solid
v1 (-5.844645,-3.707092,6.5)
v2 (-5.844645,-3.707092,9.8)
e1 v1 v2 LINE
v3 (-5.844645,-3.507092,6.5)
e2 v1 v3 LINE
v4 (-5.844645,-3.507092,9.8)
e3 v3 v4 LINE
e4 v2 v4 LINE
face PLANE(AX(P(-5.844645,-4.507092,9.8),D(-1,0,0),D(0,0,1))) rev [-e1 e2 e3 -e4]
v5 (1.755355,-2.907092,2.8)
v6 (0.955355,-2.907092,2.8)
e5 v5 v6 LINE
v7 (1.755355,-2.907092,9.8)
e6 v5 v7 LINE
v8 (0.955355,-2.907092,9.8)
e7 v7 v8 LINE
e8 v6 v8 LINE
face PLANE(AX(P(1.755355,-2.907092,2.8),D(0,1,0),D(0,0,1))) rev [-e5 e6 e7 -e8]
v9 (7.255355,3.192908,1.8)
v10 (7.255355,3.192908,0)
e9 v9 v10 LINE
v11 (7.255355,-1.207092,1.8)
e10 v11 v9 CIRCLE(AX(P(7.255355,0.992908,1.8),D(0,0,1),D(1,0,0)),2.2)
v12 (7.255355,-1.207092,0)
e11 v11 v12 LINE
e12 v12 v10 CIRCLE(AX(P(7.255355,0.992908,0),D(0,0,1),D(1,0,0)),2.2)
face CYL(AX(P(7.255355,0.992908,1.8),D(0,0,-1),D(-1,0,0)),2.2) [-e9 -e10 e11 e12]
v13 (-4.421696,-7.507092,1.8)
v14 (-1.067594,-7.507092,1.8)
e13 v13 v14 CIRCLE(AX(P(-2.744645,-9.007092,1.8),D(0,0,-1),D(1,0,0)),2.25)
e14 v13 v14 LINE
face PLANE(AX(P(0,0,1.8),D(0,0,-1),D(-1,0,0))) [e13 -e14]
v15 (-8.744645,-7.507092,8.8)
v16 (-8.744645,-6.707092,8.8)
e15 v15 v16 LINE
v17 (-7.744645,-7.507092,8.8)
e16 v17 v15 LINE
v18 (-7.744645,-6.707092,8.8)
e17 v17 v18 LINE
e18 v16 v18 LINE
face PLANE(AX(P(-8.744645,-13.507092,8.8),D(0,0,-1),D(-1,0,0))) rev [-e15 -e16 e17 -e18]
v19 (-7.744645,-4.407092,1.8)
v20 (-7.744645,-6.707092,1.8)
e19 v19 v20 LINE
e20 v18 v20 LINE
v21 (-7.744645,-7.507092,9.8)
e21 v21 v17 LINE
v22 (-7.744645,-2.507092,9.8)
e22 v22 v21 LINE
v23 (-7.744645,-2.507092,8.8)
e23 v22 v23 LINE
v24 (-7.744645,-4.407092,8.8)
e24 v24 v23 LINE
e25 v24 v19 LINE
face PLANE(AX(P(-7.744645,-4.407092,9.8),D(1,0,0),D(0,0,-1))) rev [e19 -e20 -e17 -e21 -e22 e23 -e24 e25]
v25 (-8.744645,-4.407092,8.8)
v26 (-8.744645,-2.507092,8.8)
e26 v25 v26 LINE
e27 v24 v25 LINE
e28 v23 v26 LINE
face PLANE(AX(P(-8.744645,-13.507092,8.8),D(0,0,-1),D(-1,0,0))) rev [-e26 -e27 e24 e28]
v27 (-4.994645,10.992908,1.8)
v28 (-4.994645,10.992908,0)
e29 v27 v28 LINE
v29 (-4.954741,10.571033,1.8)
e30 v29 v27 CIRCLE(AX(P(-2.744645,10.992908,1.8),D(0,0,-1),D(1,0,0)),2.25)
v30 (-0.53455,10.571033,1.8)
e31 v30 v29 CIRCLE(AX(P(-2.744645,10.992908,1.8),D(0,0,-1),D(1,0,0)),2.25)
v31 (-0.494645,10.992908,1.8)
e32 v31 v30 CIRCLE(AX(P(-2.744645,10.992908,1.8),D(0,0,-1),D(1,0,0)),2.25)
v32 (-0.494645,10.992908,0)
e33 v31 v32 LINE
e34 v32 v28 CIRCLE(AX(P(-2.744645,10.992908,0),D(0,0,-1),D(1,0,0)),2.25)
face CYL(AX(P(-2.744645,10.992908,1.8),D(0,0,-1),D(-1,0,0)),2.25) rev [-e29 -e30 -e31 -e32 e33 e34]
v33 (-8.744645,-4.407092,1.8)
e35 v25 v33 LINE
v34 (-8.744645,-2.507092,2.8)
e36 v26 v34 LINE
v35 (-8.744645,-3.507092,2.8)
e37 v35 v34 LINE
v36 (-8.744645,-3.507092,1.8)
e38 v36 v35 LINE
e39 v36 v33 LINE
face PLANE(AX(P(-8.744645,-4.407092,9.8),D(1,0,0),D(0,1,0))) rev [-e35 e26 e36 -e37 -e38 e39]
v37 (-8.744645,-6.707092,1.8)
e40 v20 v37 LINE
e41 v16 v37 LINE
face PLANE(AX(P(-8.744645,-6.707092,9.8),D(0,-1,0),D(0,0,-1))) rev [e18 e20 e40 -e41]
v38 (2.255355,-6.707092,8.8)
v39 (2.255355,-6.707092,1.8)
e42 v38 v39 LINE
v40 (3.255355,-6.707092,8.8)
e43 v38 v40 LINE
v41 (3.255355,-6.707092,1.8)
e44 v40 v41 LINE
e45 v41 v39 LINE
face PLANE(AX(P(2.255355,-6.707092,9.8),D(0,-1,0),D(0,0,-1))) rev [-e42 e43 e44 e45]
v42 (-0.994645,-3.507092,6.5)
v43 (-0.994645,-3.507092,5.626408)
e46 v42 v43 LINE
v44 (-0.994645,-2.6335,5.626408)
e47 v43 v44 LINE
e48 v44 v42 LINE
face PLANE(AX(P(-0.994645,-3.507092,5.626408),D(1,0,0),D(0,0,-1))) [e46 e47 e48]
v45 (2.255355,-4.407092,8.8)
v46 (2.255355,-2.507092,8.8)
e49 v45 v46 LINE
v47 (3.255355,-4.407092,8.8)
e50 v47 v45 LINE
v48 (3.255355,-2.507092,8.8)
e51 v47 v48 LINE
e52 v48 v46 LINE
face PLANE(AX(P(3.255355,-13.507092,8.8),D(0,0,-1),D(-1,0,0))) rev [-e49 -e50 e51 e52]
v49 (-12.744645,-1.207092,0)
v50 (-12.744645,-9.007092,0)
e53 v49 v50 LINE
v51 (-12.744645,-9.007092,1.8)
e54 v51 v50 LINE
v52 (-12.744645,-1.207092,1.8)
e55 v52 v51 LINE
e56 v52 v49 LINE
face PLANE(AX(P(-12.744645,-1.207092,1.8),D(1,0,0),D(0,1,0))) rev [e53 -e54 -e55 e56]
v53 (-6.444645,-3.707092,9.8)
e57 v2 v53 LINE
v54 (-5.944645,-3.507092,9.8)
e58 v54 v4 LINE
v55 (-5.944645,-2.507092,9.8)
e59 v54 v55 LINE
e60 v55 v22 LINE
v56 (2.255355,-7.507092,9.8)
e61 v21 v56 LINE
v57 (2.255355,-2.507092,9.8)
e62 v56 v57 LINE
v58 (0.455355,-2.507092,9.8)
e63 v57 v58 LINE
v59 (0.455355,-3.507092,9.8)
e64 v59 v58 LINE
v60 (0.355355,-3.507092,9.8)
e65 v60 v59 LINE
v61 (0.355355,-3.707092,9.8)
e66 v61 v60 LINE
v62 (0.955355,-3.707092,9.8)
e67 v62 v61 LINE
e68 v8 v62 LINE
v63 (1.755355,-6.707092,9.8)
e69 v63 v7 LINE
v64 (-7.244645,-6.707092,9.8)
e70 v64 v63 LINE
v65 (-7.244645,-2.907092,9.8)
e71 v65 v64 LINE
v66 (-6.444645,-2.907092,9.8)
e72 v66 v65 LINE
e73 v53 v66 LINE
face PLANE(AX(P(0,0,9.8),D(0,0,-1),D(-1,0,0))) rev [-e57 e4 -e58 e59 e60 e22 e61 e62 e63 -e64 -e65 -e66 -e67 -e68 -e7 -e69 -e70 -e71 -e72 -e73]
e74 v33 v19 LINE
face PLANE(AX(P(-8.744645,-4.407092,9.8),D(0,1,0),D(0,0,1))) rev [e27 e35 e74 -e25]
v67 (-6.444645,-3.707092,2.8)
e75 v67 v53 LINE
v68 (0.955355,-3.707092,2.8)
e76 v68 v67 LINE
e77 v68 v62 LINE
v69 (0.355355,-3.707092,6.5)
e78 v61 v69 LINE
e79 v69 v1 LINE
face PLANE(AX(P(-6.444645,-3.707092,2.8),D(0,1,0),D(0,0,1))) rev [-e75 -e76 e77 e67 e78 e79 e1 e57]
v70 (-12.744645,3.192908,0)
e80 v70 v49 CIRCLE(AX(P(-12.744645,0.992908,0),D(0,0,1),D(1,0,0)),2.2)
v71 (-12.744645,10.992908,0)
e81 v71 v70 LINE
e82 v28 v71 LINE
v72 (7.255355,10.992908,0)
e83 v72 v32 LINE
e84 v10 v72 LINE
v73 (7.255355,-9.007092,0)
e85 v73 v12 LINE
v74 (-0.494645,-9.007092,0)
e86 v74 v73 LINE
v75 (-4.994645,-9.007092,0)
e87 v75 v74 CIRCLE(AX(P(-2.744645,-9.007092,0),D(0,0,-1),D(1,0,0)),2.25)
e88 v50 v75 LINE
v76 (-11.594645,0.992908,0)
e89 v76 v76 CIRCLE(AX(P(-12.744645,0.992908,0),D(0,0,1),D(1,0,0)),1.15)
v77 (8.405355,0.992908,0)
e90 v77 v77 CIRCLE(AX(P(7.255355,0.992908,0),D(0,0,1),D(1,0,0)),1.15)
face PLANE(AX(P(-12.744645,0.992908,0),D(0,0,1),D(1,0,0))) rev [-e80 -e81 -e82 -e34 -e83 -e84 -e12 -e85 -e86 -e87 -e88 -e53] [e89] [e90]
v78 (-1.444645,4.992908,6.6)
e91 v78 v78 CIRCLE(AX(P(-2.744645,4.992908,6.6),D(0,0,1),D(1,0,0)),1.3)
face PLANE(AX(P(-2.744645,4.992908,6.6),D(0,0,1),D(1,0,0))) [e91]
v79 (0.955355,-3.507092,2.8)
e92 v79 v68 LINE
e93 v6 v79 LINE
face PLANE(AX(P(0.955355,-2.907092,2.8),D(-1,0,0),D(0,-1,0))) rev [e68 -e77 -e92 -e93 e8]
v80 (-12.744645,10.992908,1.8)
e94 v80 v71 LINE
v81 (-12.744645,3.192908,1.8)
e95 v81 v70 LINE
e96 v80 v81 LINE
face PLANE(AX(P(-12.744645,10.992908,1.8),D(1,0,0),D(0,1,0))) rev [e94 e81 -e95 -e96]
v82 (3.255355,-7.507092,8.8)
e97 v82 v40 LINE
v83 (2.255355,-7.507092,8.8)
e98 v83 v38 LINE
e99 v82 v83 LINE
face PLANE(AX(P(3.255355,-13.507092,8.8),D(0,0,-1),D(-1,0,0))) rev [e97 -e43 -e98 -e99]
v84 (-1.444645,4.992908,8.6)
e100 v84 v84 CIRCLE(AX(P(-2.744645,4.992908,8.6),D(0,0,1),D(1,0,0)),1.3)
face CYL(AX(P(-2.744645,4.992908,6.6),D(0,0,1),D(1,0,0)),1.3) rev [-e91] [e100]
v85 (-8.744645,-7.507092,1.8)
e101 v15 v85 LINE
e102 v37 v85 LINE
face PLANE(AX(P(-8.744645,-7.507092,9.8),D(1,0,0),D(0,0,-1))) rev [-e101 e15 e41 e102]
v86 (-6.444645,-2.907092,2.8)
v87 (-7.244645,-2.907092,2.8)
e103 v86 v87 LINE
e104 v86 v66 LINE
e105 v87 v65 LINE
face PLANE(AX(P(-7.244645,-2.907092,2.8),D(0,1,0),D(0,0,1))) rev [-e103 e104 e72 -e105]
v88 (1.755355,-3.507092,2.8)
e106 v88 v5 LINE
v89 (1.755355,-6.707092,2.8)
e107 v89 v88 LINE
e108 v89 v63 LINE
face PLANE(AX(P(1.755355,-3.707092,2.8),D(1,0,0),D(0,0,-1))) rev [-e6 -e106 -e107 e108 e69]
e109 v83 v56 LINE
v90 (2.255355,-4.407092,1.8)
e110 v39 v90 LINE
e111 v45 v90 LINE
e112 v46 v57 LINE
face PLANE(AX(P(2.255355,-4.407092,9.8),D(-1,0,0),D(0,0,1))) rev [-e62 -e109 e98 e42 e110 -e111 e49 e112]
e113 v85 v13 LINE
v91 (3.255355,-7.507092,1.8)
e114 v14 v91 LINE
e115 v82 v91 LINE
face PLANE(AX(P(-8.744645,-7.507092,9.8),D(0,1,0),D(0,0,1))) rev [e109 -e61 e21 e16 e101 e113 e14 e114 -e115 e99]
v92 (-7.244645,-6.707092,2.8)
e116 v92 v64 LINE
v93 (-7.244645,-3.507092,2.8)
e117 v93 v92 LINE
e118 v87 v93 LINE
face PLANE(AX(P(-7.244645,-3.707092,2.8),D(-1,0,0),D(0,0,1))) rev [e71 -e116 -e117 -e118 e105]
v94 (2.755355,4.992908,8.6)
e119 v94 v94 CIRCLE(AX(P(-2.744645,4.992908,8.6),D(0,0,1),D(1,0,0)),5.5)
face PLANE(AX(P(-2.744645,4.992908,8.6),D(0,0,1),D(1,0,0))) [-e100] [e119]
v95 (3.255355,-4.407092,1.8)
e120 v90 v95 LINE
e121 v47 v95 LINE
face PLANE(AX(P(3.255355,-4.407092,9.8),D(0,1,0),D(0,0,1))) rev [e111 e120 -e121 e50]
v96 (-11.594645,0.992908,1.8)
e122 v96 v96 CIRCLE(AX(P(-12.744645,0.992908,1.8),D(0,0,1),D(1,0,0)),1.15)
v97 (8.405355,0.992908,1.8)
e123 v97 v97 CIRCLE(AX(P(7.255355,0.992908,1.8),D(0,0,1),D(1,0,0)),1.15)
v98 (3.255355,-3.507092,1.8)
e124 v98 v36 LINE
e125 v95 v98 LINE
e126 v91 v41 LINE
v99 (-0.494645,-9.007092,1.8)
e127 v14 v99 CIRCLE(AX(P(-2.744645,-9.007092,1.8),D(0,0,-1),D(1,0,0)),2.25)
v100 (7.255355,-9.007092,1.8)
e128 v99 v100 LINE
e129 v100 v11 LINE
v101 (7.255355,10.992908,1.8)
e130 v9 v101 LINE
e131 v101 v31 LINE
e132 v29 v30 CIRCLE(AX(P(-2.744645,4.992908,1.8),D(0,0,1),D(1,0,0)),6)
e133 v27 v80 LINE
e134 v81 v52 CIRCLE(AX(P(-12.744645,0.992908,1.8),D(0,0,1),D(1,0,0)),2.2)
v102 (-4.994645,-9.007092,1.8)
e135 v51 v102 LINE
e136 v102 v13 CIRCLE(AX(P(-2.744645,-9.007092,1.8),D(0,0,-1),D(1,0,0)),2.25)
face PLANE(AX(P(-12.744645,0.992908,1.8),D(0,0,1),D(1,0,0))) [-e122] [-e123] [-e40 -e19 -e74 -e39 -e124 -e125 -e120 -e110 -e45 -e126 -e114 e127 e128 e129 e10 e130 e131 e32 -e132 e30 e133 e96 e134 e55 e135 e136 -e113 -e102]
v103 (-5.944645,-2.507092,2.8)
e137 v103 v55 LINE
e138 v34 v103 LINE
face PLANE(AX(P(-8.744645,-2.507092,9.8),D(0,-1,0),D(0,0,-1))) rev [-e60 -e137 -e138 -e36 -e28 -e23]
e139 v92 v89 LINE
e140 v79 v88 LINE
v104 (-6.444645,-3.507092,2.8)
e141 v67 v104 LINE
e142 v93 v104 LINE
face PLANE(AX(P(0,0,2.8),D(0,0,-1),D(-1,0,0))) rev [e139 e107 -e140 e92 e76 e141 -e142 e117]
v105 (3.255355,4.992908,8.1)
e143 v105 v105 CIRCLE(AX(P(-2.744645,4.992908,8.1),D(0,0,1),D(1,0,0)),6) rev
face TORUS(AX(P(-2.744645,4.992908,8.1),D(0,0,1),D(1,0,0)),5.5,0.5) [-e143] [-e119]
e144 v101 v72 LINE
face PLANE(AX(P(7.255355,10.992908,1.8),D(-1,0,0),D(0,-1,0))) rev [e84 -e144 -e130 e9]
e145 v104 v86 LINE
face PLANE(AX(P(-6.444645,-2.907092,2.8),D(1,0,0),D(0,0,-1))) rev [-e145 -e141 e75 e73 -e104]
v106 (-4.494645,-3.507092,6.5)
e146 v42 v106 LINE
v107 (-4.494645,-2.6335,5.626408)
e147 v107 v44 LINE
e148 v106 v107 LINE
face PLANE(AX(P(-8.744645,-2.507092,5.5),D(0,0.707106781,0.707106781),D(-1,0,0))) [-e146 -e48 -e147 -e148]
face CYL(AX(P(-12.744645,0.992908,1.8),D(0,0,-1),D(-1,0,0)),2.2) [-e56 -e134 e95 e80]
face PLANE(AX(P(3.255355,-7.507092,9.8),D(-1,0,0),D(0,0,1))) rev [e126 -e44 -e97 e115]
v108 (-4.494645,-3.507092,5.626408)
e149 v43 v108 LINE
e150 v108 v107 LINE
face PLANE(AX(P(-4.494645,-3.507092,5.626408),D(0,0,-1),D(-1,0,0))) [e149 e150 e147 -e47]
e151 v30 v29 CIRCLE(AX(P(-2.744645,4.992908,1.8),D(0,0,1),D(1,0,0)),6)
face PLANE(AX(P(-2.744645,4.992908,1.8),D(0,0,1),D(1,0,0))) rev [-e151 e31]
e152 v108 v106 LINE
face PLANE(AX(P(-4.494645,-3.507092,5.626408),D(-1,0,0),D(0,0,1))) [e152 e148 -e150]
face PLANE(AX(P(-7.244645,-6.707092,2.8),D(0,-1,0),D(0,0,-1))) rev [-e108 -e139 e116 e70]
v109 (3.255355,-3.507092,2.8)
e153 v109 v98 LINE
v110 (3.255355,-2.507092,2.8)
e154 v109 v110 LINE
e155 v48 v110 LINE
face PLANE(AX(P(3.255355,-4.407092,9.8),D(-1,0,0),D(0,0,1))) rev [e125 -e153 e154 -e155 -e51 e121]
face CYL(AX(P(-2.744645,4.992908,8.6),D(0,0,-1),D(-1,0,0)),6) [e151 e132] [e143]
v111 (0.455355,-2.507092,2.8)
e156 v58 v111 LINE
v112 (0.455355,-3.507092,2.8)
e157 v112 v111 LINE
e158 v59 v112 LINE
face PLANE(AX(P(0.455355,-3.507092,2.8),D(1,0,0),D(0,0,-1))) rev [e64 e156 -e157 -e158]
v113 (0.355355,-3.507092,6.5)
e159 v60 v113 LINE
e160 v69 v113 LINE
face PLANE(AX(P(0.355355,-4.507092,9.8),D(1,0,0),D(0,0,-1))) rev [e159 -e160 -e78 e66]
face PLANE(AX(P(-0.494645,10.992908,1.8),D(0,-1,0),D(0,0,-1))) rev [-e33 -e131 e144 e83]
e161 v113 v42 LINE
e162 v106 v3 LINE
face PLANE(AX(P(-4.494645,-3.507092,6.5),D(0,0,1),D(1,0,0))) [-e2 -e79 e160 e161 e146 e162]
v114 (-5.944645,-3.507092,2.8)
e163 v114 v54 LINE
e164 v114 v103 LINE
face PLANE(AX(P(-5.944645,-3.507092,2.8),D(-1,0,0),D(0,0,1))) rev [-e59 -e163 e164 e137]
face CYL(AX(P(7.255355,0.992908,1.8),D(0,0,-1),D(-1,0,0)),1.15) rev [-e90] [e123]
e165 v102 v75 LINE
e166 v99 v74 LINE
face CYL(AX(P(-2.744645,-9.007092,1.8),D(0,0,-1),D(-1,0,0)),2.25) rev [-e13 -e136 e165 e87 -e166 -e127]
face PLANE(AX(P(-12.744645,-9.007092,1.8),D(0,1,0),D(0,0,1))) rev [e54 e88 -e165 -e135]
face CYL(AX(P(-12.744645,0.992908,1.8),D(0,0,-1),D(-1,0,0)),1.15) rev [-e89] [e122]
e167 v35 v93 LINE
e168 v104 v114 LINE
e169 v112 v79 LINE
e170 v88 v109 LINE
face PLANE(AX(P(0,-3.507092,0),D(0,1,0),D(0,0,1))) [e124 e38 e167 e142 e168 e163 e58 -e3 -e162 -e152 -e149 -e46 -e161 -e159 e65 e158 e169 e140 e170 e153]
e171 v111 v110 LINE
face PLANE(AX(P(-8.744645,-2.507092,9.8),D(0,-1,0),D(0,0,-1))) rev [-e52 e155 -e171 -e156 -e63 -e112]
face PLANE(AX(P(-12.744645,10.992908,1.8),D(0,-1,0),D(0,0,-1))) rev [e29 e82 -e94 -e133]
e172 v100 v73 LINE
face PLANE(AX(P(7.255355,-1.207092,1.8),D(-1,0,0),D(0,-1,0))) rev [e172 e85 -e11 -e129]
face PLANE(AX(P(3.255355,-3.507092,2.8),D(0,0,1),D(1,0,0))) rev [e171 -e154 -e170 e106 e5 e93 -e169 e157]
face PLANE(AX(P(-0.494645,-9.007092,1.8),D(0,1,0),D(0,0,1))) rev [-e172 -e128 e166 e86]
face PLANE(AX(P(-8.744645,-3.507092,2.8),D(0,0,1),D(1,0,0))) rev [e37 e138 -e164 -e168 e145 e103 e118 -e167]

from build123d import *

# Parameters (mm, degrees)
ESQUISSE1_R             = 1.15
BOSS_EXTRU_1_DEPTH      = 1.8
BOSS_EXTRU_2_DEPTH      = 8
ENL_V_MAT_EXTRU_1_DEPTH = 7
ESQUISSE4_W             = 3.5
ESQUISSE4_H             = 0.873592076
ENL_V_MAT_EXTRU_2_DEPTH = 1
ESQUISSE5_W             = 1
ESQUISSE5_H             = 1
ENL_V_MAT_EXTRU_3_DEPTH = 11
ESQUISSE6_W             = 6.2
ESQUISSE6_H             = 3.3
ENL_V_MAT_EXTRU_4_DEPTH = 1
CHANFREIN1_SIZE         = 1
ESQUISSE7_R             = 6
BOSS_EXTRU_3_DEPTH      = 6.8
CONG_1_R                = 0.5
ESQUISSE8_R             = 1.3
ENL_V_MAT_EXTRU_5_DEPTH = 2


with BuildPart() as part:
    # Esquisse1 → Boss.-Extru.1 (new body)
    with BuildSketch(Plane.XY):
        with BuildLine():
            Line((-12.744645331, 10.992907801), (-4.994645331, 10.992907801))
            ThreePointArc((-4.994645331, 10.992907801), (-2.744645331, 8.742907801), (-0.494645331, 10.992907801))
            Line((-0.494645331, 10.992907801), (7.255354669, 10.992907801))
            Line((7.255354669, 10.992907801), (7.255354669, 3.192907801))
            ThreePointArc((7.255354669, 3.192907801), (9.455354669, 0.992907801), (7.255354669, -1.207092199))
            Line((7.255354669, -1.207092199), (7.255354669, -9.007092199))
            Line((7.255354669, -9.007092199), (-0.494645331, -9.007092199))
            ThreePointArc((-0.494645331, -9.007092199), (-2.744645331, -6.757092199), (-4.994645331, -9.007092199))
            Line((-4.994645331, -9.007092199), (-12.744645331, -9.007092199))
            Line((-12.744645331, -9.007092199), (-12.744645331, -1.207092199))
            ThreePointArc((-12.744645331, -1.207092199), (-14.944645331, 0.992907801), (-12.744645331, 3.192907801))
            Line((-12.744645331, 3.192907801), (-12.744645331, 10.992907801))
        make_face()
        with Locations((-12.744645331, 0.992907801)):
            Circle(ESQUISSE1_R, mode=Mode.SUBTRACT)
        with Locations((7.255354669, 0.992907801)):
            Circle(ESQUISSE1_R, mode=Mode.SUBTRACT)
    extrude(amount=BOSS_EXTRU_1_DEPTH)

    # Esquisse2 → Boss.-Extru.2 (add)
    with BuildSketch(Plane.XY.offset(1.8)):
        Polygon((-8.744645331, -7.507092199), (3.255354669, -7.507092199), (3.255354669, -6.707092199), (2.255354669, -6.707092199), (2.255354669, -4.407092199), (3.255354669, -4.407092199), (3.255354669, -2.507092199), (-8.744645331, -2.507092199), (-8.744645331, -4.407092199), (-7.744645331, -4.407092199), (-7.744645331, -6.707092199), (-8.744645331, -6.707092199), align=None)
    extrude(amount=BOSS_EXTRU_2_DEPTH)

    # Esquisse3 → Enlèv. mat.-Extru.1 (cut)
    with BuildSketch(Plane.XY.offset(9.8)):
        Polygon((-6.444645331, -3.707092199), (0.955354669, -3.707092199), (0.955354669, -2.907092199), (1.755354669, -2.907092199), (1.755354669, -3.707092199), (1.755354669, -6.707092199), (-7.244645331, -6.707092199), (-7.244645331, -3.707092199), (-7.244645331, -2.907092199), (-6.444645331, -2.907092199), align=None)
    extrude(amount=-ENL_V_MAT_EXTRU_1_DEPTH, mode=Mode.SUBTRACT)

    # Esquisse4 → Enlèv. mat.-Extru.2 (cut)
    with BuildSketch(Plane(origin=(0, -2.507092199, 0), x_dir=(1, 0, 0), z_dir=(0, 1, 0))):
        Polygon((-8.744645331, -1.8), (3.255354669, -1.8), (3.255354669, -2.8), (0.455354669, -2.8), (0.455354669, -9.8), (-5.944645331, -9.8), (-5.944645331, -2.8), (-8.744645331, -2.8), align=None)
        with Locations((-2.744645331, -6.063203962)):
            Rectangle(ESQUISSE4_W, ESQUISSE4_H, mode=Mode.SUBTRACT)
    extrude(amount=-ENL_V_MAT_EXTRU_2_DEPTH, mode=Mode.SUBTRACT)

    # Esquisse5 → Enlèv. mat.-Extru.3 (cut)
    with BuildSketch(Plane(origin=(0, -2.507092199, 0), x_dir=(1, 0, 0), z_dir=(0, 1, 0))):
        with Locations((-8.244645331, -9.3)):
            Rectangle(ESQUISSE5_W, ESQUISSE5_H)
        with Locations((2.755354669, -9.3)):
            Rectangle(ESQUISSE5_W, ESQUISSE5_H)
    extrude(amount=-ENL_V_MAT_EXTRU_3_DEPTH, mode=Mode.SUBTRACT)

    # Esquisse6 → Enlèv. mat.-Extru.4 (cut)
    with BuildSketch(Plane(origin=(0, -3.507092199, 0), x_dir=(1, 0, 0), z_dir=(0, 1, 0))):
        with Locations((-2.744645331, -8.15)):
            Rectangle(ESQUISSE6_W, ESQUISSE6_H)
    extrude(amount=-ENL_V_MAT_EXTRU_4_DEPTH, mode=Mode.SUBTRACT)

    # Chanfrein1
    # the kernel refuses this chamfer: 1 mm, written as the material it takes off along each edge
    with BuildSketch(Plane(origin=(1.577037657, -2.507092199, 6.5), x_dir=(0, -0.9996219169112968, 0.027495876610586487), z_dir=(-1, 0, 0))) as chanfrein1_piece_1_section:
        Polygon((CHANFREIN1_SIZE * 0.999621916911, -CHANFREIN1_SIZE * 0.0274958766106), (-CHANFREIN1_SIZE * 0.0274958766106, -CHANFREIN1_SIZE * 0.999621916911), (0, 0), align=None)
    chanfrein1_piece_1 = extrude(amount=6.071682988, mode=Mode.PRIVATE)
    chanfrein1_piece_1 = split(chanfrein1_piece_1, bisect_by=Plane(origin=(0.455354669, -3.107092199, 6.3), z_dir=(-1, 0, 0)), keep=Keep.TOP, mode=Mode.PRIVATE)
    add(chanfrein1_piece_1, mode=Mode.SUBTRACT)

    # Esquisse7 → Boss.-Extru.3 (add)
    with BuildSketch(Plane.XY.offset(1.8)):
        with Locations(Location((-2.744645331, 4.992907801, 0), (0, 0, 111.61384575))):
            Circle(ESQUISSE7_R)
    extrude(amount=BOSS_EXTRU_3_DEPTH)

    # Congé1
    cong_1_edges = [part.edges().sort_by_distance(p)[0] for p in [
        (-0.534549974, -0.585217199, 8.6),
    ]]
    fillet(cong_1_edges, radius=CONG_1_R)

    # Esquisse8 → Enlèv. mat.-Extru.5 (cut)
    with BuildSketch(Plane.XY.offset(8.6)):
        with Locations((-2.744645331, 4.992907801)):
            Circle(ESQUISSE8_R)
    extrude(amount=-ENL_V_MAT_EXTRU_5_DEPTH, mode=Mode.SUBTRACT)


solid = part.part
